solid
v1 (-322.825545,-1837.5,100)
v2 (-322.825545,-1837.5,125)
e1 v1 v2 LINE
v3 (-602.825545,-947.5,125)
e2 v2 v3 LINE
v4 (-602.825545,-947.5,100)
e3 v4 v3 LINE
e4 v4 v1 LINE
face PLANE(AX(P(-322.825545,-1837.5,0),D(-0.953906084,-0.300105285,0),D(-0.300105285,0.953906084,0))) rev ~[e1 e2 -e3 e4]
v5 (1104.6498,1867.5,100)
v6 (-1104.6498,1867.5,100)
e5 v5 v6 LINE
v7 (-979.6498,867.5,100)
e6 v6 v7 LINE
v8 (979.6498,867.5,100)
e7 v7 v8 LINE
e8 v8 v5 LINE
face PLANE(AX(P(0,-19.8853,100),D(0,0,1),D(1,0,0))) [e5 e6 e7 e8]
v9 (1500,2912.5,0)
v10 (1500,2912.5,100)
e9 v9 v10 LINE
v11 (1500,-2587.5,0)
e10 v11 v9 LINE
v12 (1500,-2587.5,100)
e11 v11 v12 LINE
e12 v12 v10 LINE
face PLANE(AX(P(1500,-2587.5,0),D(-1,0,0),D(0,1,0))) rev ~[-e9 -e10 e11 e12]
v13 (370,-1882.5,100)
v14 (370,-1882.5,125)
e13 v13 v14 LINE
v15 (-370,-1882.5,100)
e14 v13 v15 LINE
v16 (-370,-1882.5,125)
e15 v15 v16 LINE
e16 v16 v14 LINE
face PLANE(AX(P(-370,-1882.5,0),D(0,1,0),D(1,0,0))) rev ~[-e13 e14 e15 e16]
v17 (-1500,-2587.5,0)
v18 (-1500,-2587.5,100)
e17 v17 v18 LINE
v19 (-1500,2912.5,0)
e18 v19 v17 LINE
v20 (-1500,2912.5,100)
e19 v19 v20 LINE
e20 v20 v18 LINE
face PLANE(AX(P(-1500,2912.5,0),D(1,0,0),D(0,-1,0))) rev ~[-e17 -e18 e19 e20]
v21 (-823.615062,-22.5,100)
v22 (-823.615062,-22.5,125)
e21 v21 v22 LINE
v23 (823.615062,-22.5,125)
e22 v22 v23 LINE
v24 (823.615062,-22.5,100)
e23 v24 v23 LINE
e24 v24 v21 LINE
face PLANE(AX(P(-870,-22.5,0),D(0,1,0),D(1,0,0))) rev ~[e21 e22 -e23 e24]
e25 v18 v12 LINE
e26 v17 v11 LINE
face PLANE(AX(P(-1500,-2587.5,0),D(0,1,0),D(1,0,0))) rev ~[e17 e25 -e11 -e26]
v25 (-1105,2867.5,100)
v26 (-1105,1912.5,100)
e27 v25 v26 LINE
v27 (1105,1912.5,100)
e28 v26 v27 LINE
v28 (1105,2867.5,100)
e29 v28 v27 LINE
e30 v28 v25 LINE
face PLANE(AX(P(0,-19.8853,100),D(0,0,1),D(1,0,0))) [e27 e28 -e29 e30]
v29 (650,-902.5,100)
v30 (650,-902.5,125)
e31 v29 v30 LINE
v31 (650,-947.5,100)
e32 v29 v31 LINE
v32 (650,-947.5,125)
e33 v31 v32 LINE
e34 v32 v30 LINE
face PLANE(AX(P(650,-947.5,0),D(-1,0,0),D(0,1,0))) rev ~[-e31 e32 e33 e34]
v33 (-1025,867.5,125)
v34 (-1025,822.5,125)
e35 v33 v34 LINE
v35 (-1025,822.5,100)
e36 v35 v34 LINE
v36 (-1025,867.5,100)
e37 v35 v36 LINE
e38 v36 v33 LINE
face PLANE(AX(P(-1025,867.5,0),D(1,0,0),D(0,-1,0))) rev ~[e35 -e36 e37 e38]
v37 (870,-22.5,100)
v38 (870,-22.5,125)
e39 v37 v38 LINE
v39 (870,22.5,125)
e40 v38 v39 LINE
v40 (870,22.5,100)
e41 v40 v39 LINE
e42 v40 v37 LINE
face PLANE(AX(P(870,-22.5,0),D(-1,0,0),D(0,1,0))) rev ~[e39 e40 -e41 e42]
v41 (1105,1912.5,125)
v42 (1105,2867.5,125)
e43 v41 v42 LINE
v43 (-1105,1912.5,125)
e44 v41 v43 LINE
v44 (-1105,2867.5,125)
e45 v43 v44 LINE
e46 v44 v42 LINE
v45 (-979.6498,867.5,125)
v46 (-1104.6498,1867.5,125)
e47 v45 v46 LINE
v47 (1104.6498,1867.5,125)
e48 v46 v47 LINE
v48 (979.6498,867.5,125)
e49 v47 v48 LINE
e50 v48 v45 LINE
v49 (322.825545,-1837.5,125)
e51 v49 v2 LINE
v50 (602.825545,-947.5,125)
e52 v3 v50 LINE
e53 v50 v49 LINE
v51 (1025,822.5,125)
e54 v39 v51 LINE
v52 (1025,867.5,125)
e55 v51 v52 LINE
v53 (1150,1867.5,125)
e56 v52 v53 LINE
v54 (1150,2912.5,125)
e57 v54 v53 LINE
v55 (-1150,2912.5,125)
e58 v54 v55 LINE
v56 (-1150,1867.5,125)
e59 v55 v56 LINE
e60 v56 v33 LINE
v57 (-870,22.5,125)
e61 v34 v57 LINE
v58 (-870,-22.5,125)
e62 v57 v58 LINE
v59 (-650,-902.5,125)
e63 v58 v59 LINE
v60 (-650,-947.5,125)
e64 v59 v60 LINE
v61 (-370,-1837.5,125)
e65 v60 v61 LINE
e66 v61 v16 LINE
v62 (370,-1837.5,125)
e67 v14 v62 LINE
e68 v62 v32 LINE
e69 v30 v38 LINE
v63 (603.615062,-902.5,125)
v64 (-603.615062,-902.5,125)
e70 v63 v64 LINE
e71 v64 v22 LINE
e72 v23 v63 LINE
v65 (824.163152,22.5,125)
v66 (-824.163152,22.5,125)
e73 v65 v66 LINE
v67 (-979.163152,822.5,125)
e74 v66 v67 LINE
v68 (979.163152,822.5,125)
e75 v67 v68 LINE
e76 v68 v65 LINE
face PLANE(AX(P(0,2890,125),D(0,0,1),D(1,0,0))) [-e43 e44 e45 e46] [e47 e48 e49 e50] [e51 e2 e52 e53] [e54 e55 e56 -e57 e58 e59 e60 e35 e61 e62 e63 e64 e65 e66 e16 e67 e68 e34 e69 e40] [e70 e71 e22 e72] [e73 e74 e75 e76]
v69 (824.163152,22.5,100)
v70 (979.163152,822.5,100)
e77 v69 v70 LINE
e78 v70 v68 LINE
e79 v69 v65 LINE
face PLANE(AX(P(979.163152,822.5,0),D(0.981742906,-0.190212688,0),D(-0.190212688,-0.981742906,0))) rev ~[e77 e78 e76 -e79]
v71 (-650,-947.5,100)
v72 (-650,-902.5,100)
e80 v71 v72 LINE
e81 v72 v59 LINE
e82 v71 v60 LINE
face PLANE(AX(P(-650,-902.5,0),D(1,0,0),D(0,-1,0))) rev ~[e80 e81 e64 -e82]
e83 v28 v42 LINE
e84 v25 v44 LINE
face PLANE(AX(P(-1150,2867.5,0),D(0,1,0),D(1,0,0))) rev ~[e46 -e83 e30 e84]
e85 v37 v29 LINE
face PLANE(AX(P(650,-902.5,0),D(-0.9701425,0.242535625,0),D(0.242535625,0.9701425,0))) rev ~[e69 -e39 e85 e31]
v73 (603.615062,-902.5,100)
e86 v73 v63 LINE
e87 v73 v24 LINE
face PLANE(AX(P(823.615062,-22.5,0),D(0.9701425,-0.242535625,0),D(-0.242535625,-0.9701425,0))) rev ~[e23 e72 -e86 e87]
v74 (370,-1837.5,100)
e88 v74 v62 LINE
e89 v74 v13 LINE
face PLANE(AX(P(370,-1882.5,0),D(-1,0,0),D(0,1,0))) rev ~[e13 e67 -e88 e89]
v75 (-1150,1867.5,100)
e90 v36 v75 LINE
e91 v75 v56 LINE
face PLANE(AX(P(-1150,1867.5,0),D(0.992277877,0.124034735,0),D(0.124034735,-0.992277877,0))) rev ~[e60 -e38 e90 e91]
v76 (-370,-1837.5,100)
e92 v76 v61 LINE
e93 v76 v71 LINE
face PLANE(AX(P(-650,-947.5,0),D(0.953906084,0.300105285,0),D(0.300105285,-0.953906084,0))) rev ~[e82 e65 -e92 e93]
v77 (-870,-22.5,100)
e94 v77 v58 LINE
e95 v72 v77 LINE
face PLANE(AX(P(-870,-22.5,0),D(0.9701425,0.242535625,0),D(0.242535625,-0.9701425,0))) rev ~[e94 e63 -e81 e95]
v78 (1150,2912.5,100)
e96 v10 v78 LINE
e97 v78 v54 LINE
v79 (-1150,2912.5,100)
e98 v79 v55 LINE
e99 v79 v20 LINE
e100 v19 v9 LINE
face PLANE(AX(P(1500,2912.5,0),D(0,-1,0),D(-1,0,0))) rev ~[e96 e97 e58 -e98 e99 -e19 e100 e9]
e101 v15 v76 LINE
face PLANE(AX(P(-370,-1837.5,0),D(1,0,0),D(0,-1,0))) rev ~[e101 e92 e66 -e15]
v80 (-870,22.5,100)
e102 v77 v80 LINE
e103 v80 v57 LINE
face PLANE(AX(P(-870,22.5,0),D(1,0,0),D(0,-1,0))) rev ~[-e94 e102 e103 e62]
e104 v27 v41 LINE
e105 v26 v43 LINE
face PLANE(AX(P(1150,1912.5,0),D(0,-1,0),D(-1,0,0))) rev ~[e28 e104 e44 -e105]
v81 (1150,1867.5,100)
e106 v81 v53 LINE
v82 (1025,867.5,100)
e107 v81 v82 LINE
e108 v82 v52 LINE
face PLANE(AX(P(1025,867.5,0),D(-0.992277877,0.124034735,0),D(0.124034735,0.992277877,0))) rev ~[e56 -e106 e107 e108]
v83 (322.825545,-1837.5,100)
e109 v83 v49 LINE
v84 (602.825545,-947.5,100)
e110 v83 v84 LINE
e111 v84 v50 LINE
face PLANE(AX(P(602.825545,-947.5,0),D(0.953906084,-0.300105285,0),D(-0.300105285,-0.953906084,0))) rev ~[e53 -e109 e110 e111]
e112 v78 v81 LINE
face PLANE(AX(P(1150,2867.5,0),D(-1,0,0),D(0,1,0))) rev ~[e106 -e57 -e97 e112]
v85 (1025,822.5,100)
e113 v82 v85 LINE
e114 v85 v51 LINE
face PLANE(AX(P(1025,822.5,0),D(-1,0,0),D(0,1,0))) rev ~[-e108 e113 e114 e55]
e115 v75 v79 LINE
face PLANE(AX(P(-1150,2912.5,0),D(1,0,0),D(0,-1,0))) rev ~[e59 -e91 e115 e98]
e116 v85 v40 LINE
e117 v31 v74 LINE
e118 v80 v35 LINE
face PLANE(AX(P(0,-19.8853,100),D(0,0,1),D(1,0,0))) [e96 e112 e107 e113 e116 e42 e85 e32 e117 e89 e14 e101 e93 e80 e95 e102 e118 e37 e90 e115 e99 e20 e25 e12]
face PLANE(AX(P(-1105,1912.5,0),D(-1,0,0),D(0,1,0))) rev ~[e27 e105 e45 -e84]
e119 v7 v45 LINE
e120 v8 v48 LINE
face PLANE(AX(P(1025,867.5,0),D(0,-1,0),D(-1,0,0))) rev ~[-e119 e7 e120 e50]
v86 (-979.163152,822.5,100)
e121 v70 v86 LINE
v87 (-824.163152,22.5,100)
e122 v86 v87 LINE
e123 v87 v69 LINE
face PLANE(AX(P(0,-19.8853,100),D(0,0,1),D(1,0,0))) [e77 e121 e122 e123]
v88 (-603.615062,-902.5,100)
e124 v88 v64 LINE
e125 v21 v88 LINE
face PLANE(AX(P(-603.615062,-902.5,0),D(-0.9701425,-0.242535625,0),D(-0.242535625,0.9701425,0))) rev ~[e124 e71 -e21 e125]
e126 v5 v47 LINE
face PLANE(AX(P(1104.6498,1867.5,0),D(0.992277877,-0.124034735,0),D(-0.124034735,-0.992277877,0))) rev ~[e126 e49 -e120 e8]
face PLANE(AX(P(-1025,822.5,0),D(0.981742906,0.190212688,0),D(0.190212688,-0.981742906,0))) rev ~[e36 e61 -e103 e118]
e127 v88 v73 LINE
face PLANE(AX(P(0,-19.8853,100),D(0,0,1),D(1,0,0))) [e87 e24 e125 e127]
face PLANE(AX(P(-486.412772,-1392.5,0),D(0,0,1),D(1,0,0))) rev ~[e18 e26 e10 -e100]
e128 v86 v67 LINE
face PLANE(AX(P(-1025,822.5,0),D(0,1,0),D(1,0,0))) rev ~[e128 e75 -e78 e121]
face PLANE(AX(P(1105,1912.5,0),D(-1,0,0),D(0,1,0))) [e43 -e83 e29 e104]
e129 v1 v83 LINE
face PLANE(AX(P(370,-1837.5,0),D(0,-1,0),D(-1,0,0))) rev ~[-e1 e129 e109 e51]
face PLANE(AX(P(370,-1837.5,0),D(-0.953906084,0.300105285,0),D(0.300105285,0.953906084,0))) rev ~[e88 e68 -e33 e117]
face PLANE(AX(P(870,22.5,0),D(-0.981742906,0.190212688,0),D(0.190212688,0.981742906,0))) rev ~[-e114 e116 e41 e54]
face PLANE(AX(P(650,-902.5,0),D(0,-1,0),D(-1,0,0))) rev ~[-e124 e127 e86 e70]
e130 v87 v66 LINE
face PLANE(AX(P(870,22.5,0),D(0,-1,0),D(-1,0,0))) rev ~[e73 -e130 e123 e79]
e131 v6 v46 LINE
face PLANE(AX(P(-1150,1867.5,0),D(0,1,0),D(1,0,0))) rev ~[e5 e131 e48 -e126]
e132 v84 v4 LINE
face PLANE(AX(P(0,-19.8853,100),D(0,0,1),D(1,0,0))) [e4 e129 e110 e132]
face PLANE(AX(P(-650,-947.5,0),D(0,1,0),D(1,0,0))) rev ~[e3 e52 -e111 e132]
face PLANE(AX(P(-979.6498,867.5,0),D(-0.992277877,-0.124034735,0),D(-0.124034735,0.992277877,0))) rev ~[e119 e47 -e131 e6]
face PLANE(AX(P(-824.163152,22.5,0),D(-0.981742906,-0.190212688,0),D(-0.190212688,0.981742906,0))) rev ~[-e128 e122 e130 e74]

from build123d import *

# Parameters (mm, degrees)
F0_W     = 2210
F0_H     = 955
F0_W_2   = 45
F1_DEPTH = 100
F2_DEPTH = 125
F3_DEPTH = 125


# Not quite as in the source:
# - a feature names something its author has since deleted; it is built from what else it names


with BuildPart() as f1:
    # F0 (on Top) → F1 (new body)
    with BuildSketch(Plane.XY):
        Polygon((1500, -1587.5), (1500, 2912.5), (1150, 2912.5), (1150, 2867.5), (1150, 1912.5), (1150, 1867.5), (1025, 867.5), (1025, 822.5), (870, 22.5), (870, -22.5), (650, -902.5), (650, -947.5), (370, -1837.5), (370, -1882.5), (-370, -1882.5), (-370, -1837.5), (-650, -947.5), (-650, -902.5), (-870, -22.5), (-870, 22.5), (-1025, 822.5), (-1025, 867.5), (-1150, 1867.5), (-1150, 1912.5), (-1150, 2867.5), (-1150, 2912.5), (-1500, 2912.5), (-1500, -1587.5), (-1500, -2587.5), (1500, -2587.5), align=None)
        Polygon((322.8255446377, -1837.5), (602.8255446377, -947.5), (-602.8255446377, -947.5), (-322.8255446377, -1837.5), align=None)
        Polygon((-602.8255446377, -947.5), (-650, -947.5), (-370, -1837.5), (-322.8255446377, -1837.5), align=None)
        Polygon((370, -1837.5), (650, -947.5), (602.8255446377, -947.5), (322.8255446377, -1837.5), align=None)
        Polygon((603.6150617118, -902.5), (823.6150617118, -22.5), (-823.6150617118, -22.5), (-603.6150617118, -902.5), align=None)
        Polygon((-823.6150617118, -22.5), (-870, -22.5), (-650, -902.5), (-603.6150617118, -902.5), align=None)
        Polygon((870, -22.5), (870, 22.5), (824.1631523601, 22.5), (-824.1631523601, 22.5), (-870, 22.5), (-870, -22.5), (-823.6150617118, -22.5), (823.6150617118, -22.5), align=None)
        Polygon((650, -902.5), (870, -22.5), (823.6150617118, -22.5), (603.6150617118, -902.5), align=None)
        Polygon((870, 22.5), (1025, 822.5), (979.1631523601, 822.5), (824.1631523601, 22.5), align=None)
        Polygon((824.1631523601, 22.5), (979.1631523601, 822.5), (-979.1631523601, 822.5), (-824.1631523601, 22.5), align=None)
        Polygon((-979.1631523601, 822.5), (-1025, 822.5), (-870, 22.5), (-824.1631523601, 22.5), align=None)
        Polygon((1025, 822.5), (1025, 867.5), (979.6498001658, 867.5), (-979.6498001658, 867.5), (-1025, 867.5), (-1025, 822.5), (-979.1631523601, 822.5), (979.1631523601, 822.5), align=None)
        Polygon((979.6498001658, 867.5), (1104.6498001658, 1867.5), (-1104.6498001658, 1867.5), (-979.6498001658, 867.5), align=None)
        Polygon((1025, 867.5), (1150, 1867.5), (1104.6498001658, 1867.5), (979.6498001658, 867.5), align=None)
        Polygon((1150, 1867.5), (1150, 1912.5), (1105, 1912.5), (-1105, 1912.5), (-1150, 1912.5), (-1150, 1867.5), (-1104.6498001658, 1867.5), (1104.6498001658, 1867.5), align=None)
        Polygon((-1104.6498001658, 1867.5), (-1150, 1867.5), (-1025, 867.5), (-979.6498001658, 867.5), align=None)
        with Locations((0, 2390)):
            Rectangle(F0_W, F0_H)
        with Locations((1127.5, 2390)):
            Rectangle(F0_W_2, F0_H)
        Polygon((1150, 2867.5), (1150, 2912.5), (-1150, 2912.5), (-1150, 2867.5), (-1105, 2867.5), (1105, 2867.5), align=None)
        with Locations((-1127.5, 2390)):
            Rectangle(F0_W_2, F0_H)
        Polygon((650, -947.5), (650, -902.5), (603.6150617118, -902.5), (-603.6150617118, -902.5), (-650, -902.5), (-650, -947.5), (-602.8255446377, -947.5), (602.8255446377, -947.5), align=None)
        Polygon((370, -1882.5), (370, -1837.5), (322.8255446377, -1837.5), (-322.8255446377, -1837.5), (-370, -1837.5), (-370, -1882.5), align=None)
    extrude(amount=F1_DEPTH)

    # F0 (on Top) → F2 (join)
    with BuildSketch(Plane.XY):
        Polygon((1150, 1867.5), (1150, 1912.5), (1105, 1912.5), (-1105, 1912.5), (-1150, 1912.5), (-1150, 1867.5), (-1104.6498001658, 1867.5), (1104.6498001658, 1867.5), align=None)
        Polygon((1025, 822.5), (1025, 867.5), (979.6498001658, 867.5), (-979.6498001658, 867.5), (-1025, 867.5), (-1025, 822.5), (-979.1631523601, 822.5), (979.1631523601, 822.5), align=None)
        Polygon((870, -22.5), (870, 22.5), (824.1631523601, 22.5), (-824.1631523601, 22.5), (-870, 22.5), (-870, -22.5), (-823.6150617118, -22.5), (823.6150617118, -22.5), align=None)
        Polygon((650, -947.5), (650, -902.5), (603.6150617118, -902.5), (-603.6150617118, -902.5), (-650, -902.5), (-650, -947.5), (-602.8255446377, -947.5), (602.8255446377, -947.5), align=None)
        Polygon((370, -1882.5), (370, -1837.5), (322.8255446377, -1837.5), (-322.8255446377, -1837.5), (-370, -1837.5), (-370, -1882.5), align=None)
        Polygon((1150, 2867.5), (1150, 2912.5), (-1150, 2912.5), (-1150, 2867.5), (-1105, 2867.5), (1105, 2867.5), align=None)
    extrude(amount=F2_DEPTH)

    # F0 (on Top) → F3 (join)
    with BuildSketch(Plane.XY):
        Polygon((-602.8255446377, -947.5), (-650, -947.5), (-370, -1837.5), (-322.8255446377, -1837.5), align=None)
        Polygon((370, -1837.5), (650, -947.5), (602.8255446377, -947.5), (322.8255446377, -1837.5), align=None)
        Polygon((-823.6150617118, -22.5), (-870, -22.5), (-650, -902.5), (-603.6150617118, -902.5), align=None)
        Polygon((650, -902.5), (870, -22.5), (823.6150617118, -22.5), (603.6150617118, -902.5), align=None)
        Polygon((870, 22.5), (1025, 822.5), (979.1631523601, 822.5), (824.1631523601, 22.5), align=None)
        Polygon((-979.1631523601, 822.5), (-1025, 822.5), (-870, 22.5), (-824.1631523601, 22.5), align=None)
        Polygon((1025, 867.5), (1150, 1867.5), (1104.6498001658, 1867.5), (979.6498001658, 867.5), align=None)
        with Locations((1127.5, 2390)):
            Rectangle(F0_W_2, F0_H)
        with Locations((-1127.5, 2390)):
            Rectangle(F0_W_2, F0_H)
        Polygon((-1104.6498001658, 1867.5), (-1150, 1867.5), (-1025, 867.5), (-979.6498001658, 867.5), align=None)
    extrude(amount=F3_DEPTH)


solid = f1.part
